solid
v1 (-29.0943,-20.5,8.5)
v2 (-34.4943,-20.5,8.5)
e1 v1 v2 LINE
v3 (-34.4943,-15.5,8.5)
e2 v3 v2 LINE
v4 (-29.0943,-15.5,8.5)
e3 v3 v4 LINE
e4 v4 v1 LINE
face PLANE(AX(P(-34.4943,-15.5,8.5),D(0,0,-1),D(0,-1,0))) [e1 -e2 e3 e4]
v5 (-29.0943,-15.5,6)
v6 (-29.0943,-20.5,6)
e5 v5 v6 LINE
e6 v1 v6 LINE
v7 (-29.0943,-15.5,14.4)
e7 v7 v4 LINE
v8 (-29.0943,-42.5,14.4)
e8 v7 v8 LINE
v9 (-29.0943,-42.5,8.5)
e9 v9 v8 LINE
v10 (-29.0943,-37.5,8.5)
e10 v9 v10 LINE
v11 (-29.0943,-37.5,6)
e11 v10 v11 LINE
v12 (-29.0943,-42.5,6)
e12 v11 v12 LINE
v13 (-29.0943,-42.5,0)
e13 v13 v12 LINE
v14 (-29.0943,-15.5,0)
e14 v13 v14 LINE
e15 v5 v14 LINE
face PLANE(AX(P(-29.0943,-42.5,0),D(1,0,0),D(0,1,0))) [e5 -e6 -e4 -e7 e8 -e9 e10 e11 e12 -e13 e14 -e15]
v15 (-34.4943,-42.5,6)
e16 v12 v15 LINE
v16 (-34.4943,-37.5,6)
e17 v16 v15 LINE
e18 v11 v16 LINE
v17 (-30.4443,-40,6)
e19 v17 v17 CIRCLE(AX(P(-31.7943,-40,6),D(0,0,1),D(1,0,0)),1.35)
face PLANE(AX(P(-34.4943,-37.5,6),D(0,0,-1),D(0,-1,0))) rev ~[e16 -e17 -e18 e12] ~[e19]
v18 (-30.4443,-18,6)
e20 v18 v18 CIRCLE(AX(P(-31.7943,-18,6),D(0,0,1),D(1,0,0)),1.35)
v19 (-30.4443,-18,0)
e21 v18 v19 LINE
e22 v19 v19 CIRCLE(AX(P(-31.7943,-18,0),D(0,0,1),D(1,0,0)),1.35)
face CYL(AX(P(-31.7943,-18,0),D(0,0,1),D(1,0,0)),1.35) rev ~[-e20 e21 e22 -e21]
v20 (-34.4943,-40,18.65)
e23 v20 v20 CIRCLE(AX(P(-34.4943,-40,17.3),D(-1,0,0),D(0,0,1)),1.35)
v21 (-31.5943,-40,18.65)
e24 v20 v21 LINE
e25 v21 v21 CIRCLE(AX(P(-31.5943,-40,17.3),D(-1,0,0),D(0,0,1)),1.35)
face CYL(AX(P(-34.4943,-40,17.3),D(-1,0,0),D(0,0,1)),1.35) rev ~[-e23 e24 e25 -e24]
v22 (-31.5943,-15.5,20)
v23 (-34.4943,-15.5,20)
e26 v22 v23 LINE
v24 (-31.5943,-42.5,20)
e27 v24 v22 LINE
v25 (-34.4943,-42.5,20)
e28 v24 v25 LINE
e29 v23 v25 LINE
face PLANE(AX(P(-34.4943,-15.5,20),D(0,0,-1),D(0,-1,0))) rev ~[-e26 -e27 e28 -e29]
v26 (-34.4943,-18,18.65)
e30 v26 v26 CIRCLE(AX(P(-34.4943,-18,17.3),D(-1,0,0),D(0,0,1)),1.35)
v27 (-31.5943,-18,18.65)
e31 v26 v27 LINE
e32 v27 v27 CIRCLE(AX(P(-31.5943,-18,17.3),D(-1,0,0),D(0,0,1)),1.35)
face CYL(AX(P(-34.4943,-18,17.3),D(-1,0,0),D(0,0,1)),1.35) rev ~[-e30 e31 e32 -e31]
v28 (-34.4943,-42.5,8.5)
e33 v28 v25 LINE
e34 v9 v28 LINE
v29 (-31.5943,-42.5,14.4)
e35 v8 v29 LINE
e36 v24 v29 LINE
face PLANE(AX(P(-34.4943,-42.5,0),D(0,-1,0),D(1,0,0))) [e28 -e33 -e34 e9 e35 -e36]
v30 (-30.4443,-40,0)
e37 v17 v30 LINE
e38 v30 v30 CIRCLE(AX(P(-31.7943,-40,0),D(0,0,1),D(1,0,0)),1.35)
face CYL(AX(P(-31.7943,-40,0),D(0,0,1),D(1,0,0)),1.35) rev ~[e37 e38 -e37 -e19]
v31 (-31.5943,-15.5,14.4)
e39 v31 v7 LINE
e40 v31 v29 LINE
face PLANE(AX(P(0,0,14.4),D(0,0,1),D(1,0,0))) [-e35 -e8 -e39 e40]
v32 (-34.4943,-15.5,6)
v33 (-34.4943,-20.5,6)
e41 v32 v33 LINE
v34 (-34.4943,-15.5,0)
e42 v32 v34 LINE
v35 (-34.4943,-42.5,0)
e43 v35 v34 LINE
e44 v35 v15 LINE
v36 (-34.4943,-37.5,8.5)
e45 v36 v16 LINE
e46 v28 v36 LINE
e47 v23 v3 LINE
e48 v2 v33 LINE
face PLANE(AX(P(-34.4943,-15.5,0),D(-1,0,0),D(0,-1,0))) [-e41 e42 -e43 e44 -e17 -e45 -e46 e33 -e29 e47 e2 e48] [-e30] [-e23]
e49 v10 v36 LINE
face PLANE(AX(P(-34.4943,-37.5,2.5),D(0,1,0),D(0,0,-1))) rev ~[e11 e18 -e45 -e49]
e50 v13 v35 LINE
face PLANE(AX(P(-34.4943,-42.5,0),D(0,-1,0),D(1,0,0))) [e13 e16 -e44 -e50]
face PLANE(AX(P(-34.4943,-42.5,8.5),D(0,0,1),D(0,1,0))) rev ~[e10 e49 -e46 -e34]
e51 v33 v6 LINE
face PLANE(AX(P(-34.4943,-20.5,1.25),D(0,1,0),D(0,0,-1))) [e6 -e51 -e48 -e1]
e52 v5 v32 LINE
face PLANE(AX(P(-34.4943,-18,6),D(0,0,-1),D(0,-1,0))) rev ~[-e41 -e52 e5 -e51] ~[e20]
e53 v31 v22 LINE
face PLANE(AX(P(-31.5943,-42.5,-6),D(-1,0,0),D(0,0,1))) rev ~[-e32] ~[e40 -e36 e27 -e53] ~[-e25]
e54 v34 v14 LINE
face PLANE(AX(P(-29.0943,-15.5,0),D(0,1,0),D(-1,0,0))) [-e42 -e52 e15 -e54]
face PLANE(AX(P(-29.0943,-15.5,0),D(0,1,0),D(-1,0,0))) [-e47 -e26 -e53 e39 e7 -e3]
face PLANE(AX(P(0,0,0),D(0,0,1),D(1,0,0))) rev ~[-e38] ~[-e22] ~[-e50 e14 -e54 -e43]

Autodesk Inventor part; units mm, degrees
ref_plane "YZ Plane" through (0, 0, 0) normal (1, 0, 0) x (0, 1, 0)
ref_plane "XZ Plane" through (0, 0, 0) normal (0, 1, 0) x (-1, 0, 0)
ref_plane "작업 평면1" through (-17.0116, -44.6019, 14.5) normal (0, 0, -1) x (0, 1, 0)
sketch "스케치4" plane through (0, 0, 0) normal (0, 0, 1) x (1, 0, 0)
  arc A0 (-34.0751, 6.2636) -> (-34.5943, 4.5766) centre (-31.5943, 4.5766) ccw projected
  line L0 (-34.5943, -39.6766) -> (-34.5943, 4.5766) projected
  arc A1 (-34.5943, -39.6766) -> (-34.0751, -41.3636) centre (-31.5943, -39.6766) ccw projected
  line L1 (-30.3872, -46.7869) -> (-34.0751, -41.3636) projected
  arc A2 (-30.3872, -46.7869) -> (-27.9064, -48.1) centre (-27.9064, -45.1) ccw projected
  line L2 (-1.0822, -48.1) -> (-27.9064, -48.1) projected
  arc A3 (-1.0822, -48.1) -> (1.3986, -46.7869) centre (-1.0822, -45.1) ccw projected
  line L3 (5.0865, -41.3636) -> (1.3986, -46.7869) projected
  arc A4 (5.0865, -41.3636) -> (5.6057, -39.6766) centre (2.6057, -39.6766) ccw projected
  line L4 (5.6057, 4.5766) -> (5.6057, -39.6766) projected
  arc A5 (5.6057, 4.5766) -> (5.0865, 6.2636) centre (2.6057, 4.5766) ccw projected
  line L5 (1.1009, 12.1246) -> (5.0865, 6.2636) projected
  arc A6 (1.1009, 12.1246) -> (-0.5529, 13) centre (-0.5529, 11) ccw projected
  line L6 (-6.8443, 13) -> (-0.5529, 13) projected
  arc A7 (-5.3443, 11.5) -> (-6.8443, 13) centre (-6.8443, 11.5) ccw projected
  line L7 (-5.3443, 11.5) -> (-5.3443, 10) projected
  arc A8 (-5.3443, 10) -> (-2.9943, 7.65) centre (-2.9943, 10) ccw projected
  line L8 (-2.9943, 7.65) -> (-0.9943, 7.65) projected
  arc A9 (0.0057, 6.65) -> (-0.9943, 7.65) centre (-0.9943, 6.65) ccw projected
  line L9 (0.0057, 6.65) -> (0.0057, -36.15) projected
  arc A10 (-0.9943, -37.15) -> (0.0057, -36.15) centre (-0.9943, -36.15) ccw projected
  line L10 (-0.9943, -37.15) -> (-2.9943, -37.15) projected
  arc A11 (-2.9943, -37.15) -> (-5.3443, -39.5) centre (-2.9943, -39.5) ccw projected
  line L11 (-5.3443, -39.5) -> (-5.3443, -41.5) projected
  arc A12 (-6.3443, -42.5) -> (-5.3443, -41.5) centre (-6.3443, -41.5) ccw projected
  line L12 (-6.3443, -42.5) -> (-22.6443, -42.5) projected
  arc A13 (-23.6443, -41.5) -> (-22.6443, -42.5) centre (-22.6443, -41.5) ccw projected
  line L13 (-23.6443, -41.5) -> (-23.6443, -39.5) projected
  arc A14 (-23.6443, -39.5) -> (-25.9943, -37.15) centre (-25.9943, -39.5) ccw projected
  line L14 (-25.9943, -37.15) -> (-27.9943, -37.15) projected
  arc A15 (-28.9943, -36.15) -> (-27.9943, -37.15) centre (-27.9943, -36.15) ccw projected
  line L15 (-28.9943, -36.15) -> (-28.9943, 6.65) projected
  arc A16 (-27.9943, 7.65) -> (-28.9943, 6.65) centre (-27.9943, 6.65) ccw projected
  line L16 (-27.9943, 7.65) -> (-25.9943, 7.65) projected
  arc A17 (-25.9943, 7.65) -> (-23.6443, 10) centre (-25.9943, 10) ccw projected
  line L17 (-23.6443, 10) -> (-23.6443, 11.5) projected
  arc A18 (-22.1443, 13) -> (-23.6443, 11.5) centre (-22.1443, 11.5) ccw projected
  line L18 (-28.4357, 13) -> (-22.1443, 13) projected
  arc A19 (-28.4357, 13) -> (-30.0896, 12.1246) centre (-28.4357, 11) ccw projected
  line L19 (-34.0751, 6.2636) -> (-30.0896, 12.1246) projected
  circle A20 centre (2.8057, 4) radius 1.35 projected
  circle A21 centre (2.8057, -18) radius 1.35 projected
  circle A22 centre (-3.4943, -45.3) radius 1.35 projected
  circle A23 centre (-31.7943, 4) radius 1.35 projected
  circle A24 centre (-31.7943, -18) radius 1.35 projected
  circle A25 centre (-25.4943, -45.3) radius 1.35 projected
  circle A26 centre (2.8057, -40) radius 1.35 projected
  circle A27 centre (-31.7943, -40) radius 1.35 projected
  line L20 (-31.7943, -40) -> (-31.7943, -18)
  line L21 (-29.0943, -15.5) -> (-34.4943, -15.5)
  line L22 (-34.4943, -15.5) -> (-34.4943, -42.5)
  line L23 (-34.4943, -42.5) -> (-29.0943, -42.5)
  line L24 (-29.0943, -42.5) -> (-29.0943, -15.5)
  line L25 (-29.0943, -15.5) -> (-34.4943, -42.5) construction
  line L26 (-34.4943, -15.5) -> (-29.0943, -42.5) construction
  point P0 (0, 0)
  point P1 (-31.7943, -29)
  dimension "d10" = 5.4
  dimension "d11" = 27
extrude "돌출4" add sketch "스케치4" against normal blind 6 contours L22 L21 L24 L23 L1 A1 | A1 L1 L23 L22
sketch "스케치5" plane through (0, 0, 0) normal (0, 0, 1) x (1, 0, 0)
  line L0 (-34.4943, -15.5) -> (-34.4943, -42.5) projected
  line L1 (-34.4943, -42.5) -> (-29.0943, -42.5) projected
  line L2 (-29.0943, -42.5) -> (-29.0943, -15.5) projected
  line L3 (-29.0943, -15.5) -> (-34.4943, -15.5) projected
  circle A0 centre (-31.7943, -40) radius 1.35 projected
  circle A1 centre (-31.7943, -18) radius 1.35 projected
  point P0 (0, 0)
extrude "돌출5" add sketch "스케치5" along normal blind 14.4 contours L3 L2 L1 L0 | A0 | A1
sketch "스케치6" plane through (-34.4943, -42.5, -6) normal (-1, 0, 0) x (0, 0, 1)
  line L0 (25.6, 57) -> (29.1, 57)
  line L1 (25.6, 57) -> (20.5, 51)
  line L2 (20.5, 51) -> (20.5, -2.1)
  line L3 (20.5, -2.1) -> (25.6, -8.1)
  line L4 (25.6, -8.1) -> (55.6, -8.1)
  line L5 (55.6, -8.1) -> (60.7, -2.1)
  line L6 (60.7, -2.1) -> (60.7, 51)
  line L7 (60.7, 51) -> (55.6, 57)
  line L8 (52.1, 57) -> (55.6, 57)
  arc A0 (55.1, 54) -> (52.1, 57) centre (52.1, 54) ccw
  line L9 (55.1, 0.5) -> (55.1, 54)
  arc A1 (52.1, -2.5) -> (55.1, 0.5) centre (52.1, 0.5) ccw
  line L10 (29.1, -2.5) -> (52.1, -2.5)
  arc A2 (26.1, 0.5) -> (29.1, -2.5) centre (29.1, 0.5) ccw
  line L11 (26.1, 54) -> (26.1, 0.5)
  arc A3 (29.1, 57) -> (26.1, 54) centre (29.1, 54) ccw
  circle A4 centre (57.9, 46.5) radius 1.35
  circle A5 centre (57.9, 24.5) radius 1.35
  circle A6 centre (57.9, 2.5) radius 1.35
  circle A7 centre (51.6, -5.3) radius 1.35
  circle A8 centre (23.3, 46.5) radius 1.35
  circle A9 centre (23.3, 24.5) radius 1.35
  circle A10 centre (23.3, 2.5) radius 1.35
  circle A11 centre (29.6, -5.3) radius 1.35
  line L12 (20.4, 27) -> (0, 27)
  line L13 (0, 0) -> (0, 27)
  line L14 (0, 0) -> (20.4, 0)
  line L15 (20.4, 27) -> (20.4, 0)
  line L16 (20.4, 0) -> (20.4, 27)
  line L17 (20.4, 27) -> (26, 27)
  line L18 (26, 27) -> (26, 0)
  line L19 (26, 0) -> (20.4, 0)
  line L20 (25.6959, -1.4327) -> (25.7781, -6.0132)
  line L21 (68.9946, 18.9724) -> (67.812, 18.9512)
  arc A12 (65.7765, 20.915) -> (67.812, 18.9512) centre (67.7762, 20.9508) ccw
  line L22 (65.7765, 20.915) -> (65.7397, 22.9646)
  arc A13 (65.7397, 22.9646) -> (64.7219, 23.9465) centre (64.7399, 22.9467) ccw
  line L23 (64.7219, 23.9465) -> (31.7272, 23.3545)
  arc A14 (31.7272, 23.3545) -> (30.7453, 22.3368) centre (31.7452, 22.3547) ccw
  line L24 (30.7453, 22.3368) -> (30.7821, 20.2871)
  arc A15 (28.8183, 18.2515) -> (30.7821, 20.2871) centre (28.7824, 20.2512) ccw
  line L25 (28.8183, 18.2515) -> (26.8186, 18.2157)
  arc A16 (26.8186, 18.2157) -> (25.8367, 17.1979) centre (26.8366, 17.2158) ccw
  line L26 (25.8367, 17.1979) -> (26.0574, 4.8999)
  arc A17 (26.0574, 4.8999) -> (27.0752, 3.918) centre (27.0572, 4.9178) ccw
  line L27 (27.0752, 3.918) -> (29.0748, 3.9538)
  arc A18 (31.1104, 1.99) -> (29.0748, 3.9538) centre (29.1107, 1.9542) ccw
  line L28 (31.1104, 1.99) -> (31.1472, -0.0596)
  arc A19 (31.1472, -0.0596) -> (32.165, -1.0415) centre (32.147, -0.0417) ccw
  line L29 (32.165, -1.0415) -> (65.1596, -0.4495)
  arc A20 (65.1596, -0.4495) -> (66.1415, 0.5682) centre (65.1417, 0.5503) ccw
  line L30 (66.1415, 0.5682) -> (66.1048, 2.6179)
  arc A21 (68.0686, 4.6535) -> (66.1048, 2.6179) centre (68.1044, 2.6538) ccw
  line L31 (68.0686, 4.6535) -> (69.2511, 4.6747)
  spline S0 degree 3 poles (69.2511, 4.6747) (69.5339, 4.6798) (69.869, 4.7337) (70.3387, 4.9133) (70.5662, 5.0474) (70.8526, 5.3129) (70.9739, 5.4731) (71.0515, 5.6305) knots 0 0 0 0 0.420045 0.420045 0.746892 0.746892 1 1 1 1
  line L32 (71.1676, -0.8418) -> (71.0515, 5.6305)
  line L33 (65.2601, -6.0486) -> (71.1676, -0.8418)
  line L34 (26.6663, -6.7411) -> (65.2601, -6.0486)
  line L35 (20.5758, -1.7496) -> (26.6663, -6.7411)
  line L36 (20.1201, 23.6464) -> (20.5758, -1.7496)
  line L37 (26.0277, 28.8532) -> (20.1201, 23.6464)
  line L38 (64.6215, 29.5456) -> (26.0277, 28.8532)
  line L39 (70.712, 24.5541) -> (64.6215, 29.5456)
  line L40 (70.8281, 18.0818) -> (70.712, 24.5541)
  spline S1 degree 3 poles (70.8281, 18.0818) (70.7449, 18.2363) (70.6179, 18.3921) (70.3222, 18.6471) (70.09, 18.7729) (69.6142, 18.9356) (69.2774, 18.9775) (68.9946, 18.9724) knots 0 0 0 0 0.253108 0.253108 0.579955 0.579955 1 1 1 1
  circle A22 centre (63.1719, 26.7192) radius 1.35
  circle A23 centre (46.1747, 26.4142) radius 1.35
  circle A24 centre (22.995, 19.4973) radius 1.35
  circle A25 centre (63.7101, -3.276) radius 1.35
  circle A26 centre (46.7129, -3.581) radius 1.35
  circle A27 centre (23.3, 2.5) radius 1.35
  circle A28 centre (29.1774, 26.1092) radius 1.35
  circle A29 centre (29.7156, -3.8859) radius 1.35
  line L41 (26, 23.5159) -> (0, 23.5159)
  point P0 (6, 42.5)
  dimension "d16" = 5.6
extrude "돌출6" add sketch "스케치6" against normal blind 2.9 contours L17 L37 L2 | L2 L37 L15 L17 | L37 L17 L18 L41 A9 L2 | L2 L41 L15 L37 | L41 A9 L18 A16 L26 L19 L36 L2 | L2 L36 L15 L41 | L18 L26 A16 | L36 L19 L2 | L2 L19 L15 L36 | A24
sketch "스케치7" plane through (-34.4943, -42.5, -6) normal (-1, 0, 0) x (0, 0, 1)
  line L0 (0, 1.15) -> (0, 3.85) projected
  line L1 (6, 3.85) -> (6, 1.15) projected
  line L2 (0, 23.15) -> (0, 25.85) projected
  line L3 (0, 23.15) -> (0, 25.85) projected
  line L4 (6, 2.5) -> (0, 2.5)
  line L5 (0, 2.5) -> (0, 24.5)
  line L6 (0, 24.5) -> (6, 24.5)
  line L7 (6, 24.5) -> (6, 2.5)
  line L8 (6, 2.5) -> (6, 24.5)
  line L9 (6, 24.5) -> (7.25, 24.5)
  line L10 (7.25, 24.5) -> (7.25, 2.5)
  line L11 (7.25, 2.5) -> (6, 2.5)
  line L12 (8.5, 5) -> (6, 5)
  line L13 (6, 5) -> (6, 0)
  line L14 (6, 0) -> (8.5, 0)
  line L15 (8.5, 0) -> (8.5, 5)
  line L16 (8.5, 5) -> (6, 0) construction
  line L17 (6, 5) -> (8.5, 0) construction
  line L18 (8.5, 22) -> (6, 22)
  line L19 (6, 22) -> (6, 27)
  line L20 (6, 27) -> (8.5, 27)
  line L21 (8.5, 27) -> (8.5, 22)
  line L22 (8.5, 22) -> (6, 27) construction
  line L23 (6, 22) -> (8.5, 27) construction
  point P0 (6, 42.5)
  point P1 (6, 5)
  point P2 (6, 1.15)
  dimension "d19" = 1.25
  dimension "d20" = 2.5
  dimension "d21" = 5
  dimension "d22" = 2.5
  dimension "d23" = 5
extrude "돌출7" cut sketch "스케치7" against normal through all contours L11 L10 L12 L15 L14 L13 L1 | L1 L7 L12 L10 L11 | L9 L10 L18 L7 | L19 L20 L21 L18 L10 L9
move faces "이동1" translate (0, 0, 6) faces at (-29.5959, -25.5425, -6) (-32.6943, -37.5, 1.6667) (-32.6943, -20.5, 0.8333) (-30.8943, -17.1667, 2.5) (-29.5443, -18, 0) (-30.4487, -18.1086, -4) (-30.8943, -15.5, -2) (-30.8943, -39.1667, 2.5) (-29.5443, -40, 0) (-30.4487, -40.1086, -4) (-32.6943, -42.5, -4)
properties part number "Vertical_Connector_CPY"
